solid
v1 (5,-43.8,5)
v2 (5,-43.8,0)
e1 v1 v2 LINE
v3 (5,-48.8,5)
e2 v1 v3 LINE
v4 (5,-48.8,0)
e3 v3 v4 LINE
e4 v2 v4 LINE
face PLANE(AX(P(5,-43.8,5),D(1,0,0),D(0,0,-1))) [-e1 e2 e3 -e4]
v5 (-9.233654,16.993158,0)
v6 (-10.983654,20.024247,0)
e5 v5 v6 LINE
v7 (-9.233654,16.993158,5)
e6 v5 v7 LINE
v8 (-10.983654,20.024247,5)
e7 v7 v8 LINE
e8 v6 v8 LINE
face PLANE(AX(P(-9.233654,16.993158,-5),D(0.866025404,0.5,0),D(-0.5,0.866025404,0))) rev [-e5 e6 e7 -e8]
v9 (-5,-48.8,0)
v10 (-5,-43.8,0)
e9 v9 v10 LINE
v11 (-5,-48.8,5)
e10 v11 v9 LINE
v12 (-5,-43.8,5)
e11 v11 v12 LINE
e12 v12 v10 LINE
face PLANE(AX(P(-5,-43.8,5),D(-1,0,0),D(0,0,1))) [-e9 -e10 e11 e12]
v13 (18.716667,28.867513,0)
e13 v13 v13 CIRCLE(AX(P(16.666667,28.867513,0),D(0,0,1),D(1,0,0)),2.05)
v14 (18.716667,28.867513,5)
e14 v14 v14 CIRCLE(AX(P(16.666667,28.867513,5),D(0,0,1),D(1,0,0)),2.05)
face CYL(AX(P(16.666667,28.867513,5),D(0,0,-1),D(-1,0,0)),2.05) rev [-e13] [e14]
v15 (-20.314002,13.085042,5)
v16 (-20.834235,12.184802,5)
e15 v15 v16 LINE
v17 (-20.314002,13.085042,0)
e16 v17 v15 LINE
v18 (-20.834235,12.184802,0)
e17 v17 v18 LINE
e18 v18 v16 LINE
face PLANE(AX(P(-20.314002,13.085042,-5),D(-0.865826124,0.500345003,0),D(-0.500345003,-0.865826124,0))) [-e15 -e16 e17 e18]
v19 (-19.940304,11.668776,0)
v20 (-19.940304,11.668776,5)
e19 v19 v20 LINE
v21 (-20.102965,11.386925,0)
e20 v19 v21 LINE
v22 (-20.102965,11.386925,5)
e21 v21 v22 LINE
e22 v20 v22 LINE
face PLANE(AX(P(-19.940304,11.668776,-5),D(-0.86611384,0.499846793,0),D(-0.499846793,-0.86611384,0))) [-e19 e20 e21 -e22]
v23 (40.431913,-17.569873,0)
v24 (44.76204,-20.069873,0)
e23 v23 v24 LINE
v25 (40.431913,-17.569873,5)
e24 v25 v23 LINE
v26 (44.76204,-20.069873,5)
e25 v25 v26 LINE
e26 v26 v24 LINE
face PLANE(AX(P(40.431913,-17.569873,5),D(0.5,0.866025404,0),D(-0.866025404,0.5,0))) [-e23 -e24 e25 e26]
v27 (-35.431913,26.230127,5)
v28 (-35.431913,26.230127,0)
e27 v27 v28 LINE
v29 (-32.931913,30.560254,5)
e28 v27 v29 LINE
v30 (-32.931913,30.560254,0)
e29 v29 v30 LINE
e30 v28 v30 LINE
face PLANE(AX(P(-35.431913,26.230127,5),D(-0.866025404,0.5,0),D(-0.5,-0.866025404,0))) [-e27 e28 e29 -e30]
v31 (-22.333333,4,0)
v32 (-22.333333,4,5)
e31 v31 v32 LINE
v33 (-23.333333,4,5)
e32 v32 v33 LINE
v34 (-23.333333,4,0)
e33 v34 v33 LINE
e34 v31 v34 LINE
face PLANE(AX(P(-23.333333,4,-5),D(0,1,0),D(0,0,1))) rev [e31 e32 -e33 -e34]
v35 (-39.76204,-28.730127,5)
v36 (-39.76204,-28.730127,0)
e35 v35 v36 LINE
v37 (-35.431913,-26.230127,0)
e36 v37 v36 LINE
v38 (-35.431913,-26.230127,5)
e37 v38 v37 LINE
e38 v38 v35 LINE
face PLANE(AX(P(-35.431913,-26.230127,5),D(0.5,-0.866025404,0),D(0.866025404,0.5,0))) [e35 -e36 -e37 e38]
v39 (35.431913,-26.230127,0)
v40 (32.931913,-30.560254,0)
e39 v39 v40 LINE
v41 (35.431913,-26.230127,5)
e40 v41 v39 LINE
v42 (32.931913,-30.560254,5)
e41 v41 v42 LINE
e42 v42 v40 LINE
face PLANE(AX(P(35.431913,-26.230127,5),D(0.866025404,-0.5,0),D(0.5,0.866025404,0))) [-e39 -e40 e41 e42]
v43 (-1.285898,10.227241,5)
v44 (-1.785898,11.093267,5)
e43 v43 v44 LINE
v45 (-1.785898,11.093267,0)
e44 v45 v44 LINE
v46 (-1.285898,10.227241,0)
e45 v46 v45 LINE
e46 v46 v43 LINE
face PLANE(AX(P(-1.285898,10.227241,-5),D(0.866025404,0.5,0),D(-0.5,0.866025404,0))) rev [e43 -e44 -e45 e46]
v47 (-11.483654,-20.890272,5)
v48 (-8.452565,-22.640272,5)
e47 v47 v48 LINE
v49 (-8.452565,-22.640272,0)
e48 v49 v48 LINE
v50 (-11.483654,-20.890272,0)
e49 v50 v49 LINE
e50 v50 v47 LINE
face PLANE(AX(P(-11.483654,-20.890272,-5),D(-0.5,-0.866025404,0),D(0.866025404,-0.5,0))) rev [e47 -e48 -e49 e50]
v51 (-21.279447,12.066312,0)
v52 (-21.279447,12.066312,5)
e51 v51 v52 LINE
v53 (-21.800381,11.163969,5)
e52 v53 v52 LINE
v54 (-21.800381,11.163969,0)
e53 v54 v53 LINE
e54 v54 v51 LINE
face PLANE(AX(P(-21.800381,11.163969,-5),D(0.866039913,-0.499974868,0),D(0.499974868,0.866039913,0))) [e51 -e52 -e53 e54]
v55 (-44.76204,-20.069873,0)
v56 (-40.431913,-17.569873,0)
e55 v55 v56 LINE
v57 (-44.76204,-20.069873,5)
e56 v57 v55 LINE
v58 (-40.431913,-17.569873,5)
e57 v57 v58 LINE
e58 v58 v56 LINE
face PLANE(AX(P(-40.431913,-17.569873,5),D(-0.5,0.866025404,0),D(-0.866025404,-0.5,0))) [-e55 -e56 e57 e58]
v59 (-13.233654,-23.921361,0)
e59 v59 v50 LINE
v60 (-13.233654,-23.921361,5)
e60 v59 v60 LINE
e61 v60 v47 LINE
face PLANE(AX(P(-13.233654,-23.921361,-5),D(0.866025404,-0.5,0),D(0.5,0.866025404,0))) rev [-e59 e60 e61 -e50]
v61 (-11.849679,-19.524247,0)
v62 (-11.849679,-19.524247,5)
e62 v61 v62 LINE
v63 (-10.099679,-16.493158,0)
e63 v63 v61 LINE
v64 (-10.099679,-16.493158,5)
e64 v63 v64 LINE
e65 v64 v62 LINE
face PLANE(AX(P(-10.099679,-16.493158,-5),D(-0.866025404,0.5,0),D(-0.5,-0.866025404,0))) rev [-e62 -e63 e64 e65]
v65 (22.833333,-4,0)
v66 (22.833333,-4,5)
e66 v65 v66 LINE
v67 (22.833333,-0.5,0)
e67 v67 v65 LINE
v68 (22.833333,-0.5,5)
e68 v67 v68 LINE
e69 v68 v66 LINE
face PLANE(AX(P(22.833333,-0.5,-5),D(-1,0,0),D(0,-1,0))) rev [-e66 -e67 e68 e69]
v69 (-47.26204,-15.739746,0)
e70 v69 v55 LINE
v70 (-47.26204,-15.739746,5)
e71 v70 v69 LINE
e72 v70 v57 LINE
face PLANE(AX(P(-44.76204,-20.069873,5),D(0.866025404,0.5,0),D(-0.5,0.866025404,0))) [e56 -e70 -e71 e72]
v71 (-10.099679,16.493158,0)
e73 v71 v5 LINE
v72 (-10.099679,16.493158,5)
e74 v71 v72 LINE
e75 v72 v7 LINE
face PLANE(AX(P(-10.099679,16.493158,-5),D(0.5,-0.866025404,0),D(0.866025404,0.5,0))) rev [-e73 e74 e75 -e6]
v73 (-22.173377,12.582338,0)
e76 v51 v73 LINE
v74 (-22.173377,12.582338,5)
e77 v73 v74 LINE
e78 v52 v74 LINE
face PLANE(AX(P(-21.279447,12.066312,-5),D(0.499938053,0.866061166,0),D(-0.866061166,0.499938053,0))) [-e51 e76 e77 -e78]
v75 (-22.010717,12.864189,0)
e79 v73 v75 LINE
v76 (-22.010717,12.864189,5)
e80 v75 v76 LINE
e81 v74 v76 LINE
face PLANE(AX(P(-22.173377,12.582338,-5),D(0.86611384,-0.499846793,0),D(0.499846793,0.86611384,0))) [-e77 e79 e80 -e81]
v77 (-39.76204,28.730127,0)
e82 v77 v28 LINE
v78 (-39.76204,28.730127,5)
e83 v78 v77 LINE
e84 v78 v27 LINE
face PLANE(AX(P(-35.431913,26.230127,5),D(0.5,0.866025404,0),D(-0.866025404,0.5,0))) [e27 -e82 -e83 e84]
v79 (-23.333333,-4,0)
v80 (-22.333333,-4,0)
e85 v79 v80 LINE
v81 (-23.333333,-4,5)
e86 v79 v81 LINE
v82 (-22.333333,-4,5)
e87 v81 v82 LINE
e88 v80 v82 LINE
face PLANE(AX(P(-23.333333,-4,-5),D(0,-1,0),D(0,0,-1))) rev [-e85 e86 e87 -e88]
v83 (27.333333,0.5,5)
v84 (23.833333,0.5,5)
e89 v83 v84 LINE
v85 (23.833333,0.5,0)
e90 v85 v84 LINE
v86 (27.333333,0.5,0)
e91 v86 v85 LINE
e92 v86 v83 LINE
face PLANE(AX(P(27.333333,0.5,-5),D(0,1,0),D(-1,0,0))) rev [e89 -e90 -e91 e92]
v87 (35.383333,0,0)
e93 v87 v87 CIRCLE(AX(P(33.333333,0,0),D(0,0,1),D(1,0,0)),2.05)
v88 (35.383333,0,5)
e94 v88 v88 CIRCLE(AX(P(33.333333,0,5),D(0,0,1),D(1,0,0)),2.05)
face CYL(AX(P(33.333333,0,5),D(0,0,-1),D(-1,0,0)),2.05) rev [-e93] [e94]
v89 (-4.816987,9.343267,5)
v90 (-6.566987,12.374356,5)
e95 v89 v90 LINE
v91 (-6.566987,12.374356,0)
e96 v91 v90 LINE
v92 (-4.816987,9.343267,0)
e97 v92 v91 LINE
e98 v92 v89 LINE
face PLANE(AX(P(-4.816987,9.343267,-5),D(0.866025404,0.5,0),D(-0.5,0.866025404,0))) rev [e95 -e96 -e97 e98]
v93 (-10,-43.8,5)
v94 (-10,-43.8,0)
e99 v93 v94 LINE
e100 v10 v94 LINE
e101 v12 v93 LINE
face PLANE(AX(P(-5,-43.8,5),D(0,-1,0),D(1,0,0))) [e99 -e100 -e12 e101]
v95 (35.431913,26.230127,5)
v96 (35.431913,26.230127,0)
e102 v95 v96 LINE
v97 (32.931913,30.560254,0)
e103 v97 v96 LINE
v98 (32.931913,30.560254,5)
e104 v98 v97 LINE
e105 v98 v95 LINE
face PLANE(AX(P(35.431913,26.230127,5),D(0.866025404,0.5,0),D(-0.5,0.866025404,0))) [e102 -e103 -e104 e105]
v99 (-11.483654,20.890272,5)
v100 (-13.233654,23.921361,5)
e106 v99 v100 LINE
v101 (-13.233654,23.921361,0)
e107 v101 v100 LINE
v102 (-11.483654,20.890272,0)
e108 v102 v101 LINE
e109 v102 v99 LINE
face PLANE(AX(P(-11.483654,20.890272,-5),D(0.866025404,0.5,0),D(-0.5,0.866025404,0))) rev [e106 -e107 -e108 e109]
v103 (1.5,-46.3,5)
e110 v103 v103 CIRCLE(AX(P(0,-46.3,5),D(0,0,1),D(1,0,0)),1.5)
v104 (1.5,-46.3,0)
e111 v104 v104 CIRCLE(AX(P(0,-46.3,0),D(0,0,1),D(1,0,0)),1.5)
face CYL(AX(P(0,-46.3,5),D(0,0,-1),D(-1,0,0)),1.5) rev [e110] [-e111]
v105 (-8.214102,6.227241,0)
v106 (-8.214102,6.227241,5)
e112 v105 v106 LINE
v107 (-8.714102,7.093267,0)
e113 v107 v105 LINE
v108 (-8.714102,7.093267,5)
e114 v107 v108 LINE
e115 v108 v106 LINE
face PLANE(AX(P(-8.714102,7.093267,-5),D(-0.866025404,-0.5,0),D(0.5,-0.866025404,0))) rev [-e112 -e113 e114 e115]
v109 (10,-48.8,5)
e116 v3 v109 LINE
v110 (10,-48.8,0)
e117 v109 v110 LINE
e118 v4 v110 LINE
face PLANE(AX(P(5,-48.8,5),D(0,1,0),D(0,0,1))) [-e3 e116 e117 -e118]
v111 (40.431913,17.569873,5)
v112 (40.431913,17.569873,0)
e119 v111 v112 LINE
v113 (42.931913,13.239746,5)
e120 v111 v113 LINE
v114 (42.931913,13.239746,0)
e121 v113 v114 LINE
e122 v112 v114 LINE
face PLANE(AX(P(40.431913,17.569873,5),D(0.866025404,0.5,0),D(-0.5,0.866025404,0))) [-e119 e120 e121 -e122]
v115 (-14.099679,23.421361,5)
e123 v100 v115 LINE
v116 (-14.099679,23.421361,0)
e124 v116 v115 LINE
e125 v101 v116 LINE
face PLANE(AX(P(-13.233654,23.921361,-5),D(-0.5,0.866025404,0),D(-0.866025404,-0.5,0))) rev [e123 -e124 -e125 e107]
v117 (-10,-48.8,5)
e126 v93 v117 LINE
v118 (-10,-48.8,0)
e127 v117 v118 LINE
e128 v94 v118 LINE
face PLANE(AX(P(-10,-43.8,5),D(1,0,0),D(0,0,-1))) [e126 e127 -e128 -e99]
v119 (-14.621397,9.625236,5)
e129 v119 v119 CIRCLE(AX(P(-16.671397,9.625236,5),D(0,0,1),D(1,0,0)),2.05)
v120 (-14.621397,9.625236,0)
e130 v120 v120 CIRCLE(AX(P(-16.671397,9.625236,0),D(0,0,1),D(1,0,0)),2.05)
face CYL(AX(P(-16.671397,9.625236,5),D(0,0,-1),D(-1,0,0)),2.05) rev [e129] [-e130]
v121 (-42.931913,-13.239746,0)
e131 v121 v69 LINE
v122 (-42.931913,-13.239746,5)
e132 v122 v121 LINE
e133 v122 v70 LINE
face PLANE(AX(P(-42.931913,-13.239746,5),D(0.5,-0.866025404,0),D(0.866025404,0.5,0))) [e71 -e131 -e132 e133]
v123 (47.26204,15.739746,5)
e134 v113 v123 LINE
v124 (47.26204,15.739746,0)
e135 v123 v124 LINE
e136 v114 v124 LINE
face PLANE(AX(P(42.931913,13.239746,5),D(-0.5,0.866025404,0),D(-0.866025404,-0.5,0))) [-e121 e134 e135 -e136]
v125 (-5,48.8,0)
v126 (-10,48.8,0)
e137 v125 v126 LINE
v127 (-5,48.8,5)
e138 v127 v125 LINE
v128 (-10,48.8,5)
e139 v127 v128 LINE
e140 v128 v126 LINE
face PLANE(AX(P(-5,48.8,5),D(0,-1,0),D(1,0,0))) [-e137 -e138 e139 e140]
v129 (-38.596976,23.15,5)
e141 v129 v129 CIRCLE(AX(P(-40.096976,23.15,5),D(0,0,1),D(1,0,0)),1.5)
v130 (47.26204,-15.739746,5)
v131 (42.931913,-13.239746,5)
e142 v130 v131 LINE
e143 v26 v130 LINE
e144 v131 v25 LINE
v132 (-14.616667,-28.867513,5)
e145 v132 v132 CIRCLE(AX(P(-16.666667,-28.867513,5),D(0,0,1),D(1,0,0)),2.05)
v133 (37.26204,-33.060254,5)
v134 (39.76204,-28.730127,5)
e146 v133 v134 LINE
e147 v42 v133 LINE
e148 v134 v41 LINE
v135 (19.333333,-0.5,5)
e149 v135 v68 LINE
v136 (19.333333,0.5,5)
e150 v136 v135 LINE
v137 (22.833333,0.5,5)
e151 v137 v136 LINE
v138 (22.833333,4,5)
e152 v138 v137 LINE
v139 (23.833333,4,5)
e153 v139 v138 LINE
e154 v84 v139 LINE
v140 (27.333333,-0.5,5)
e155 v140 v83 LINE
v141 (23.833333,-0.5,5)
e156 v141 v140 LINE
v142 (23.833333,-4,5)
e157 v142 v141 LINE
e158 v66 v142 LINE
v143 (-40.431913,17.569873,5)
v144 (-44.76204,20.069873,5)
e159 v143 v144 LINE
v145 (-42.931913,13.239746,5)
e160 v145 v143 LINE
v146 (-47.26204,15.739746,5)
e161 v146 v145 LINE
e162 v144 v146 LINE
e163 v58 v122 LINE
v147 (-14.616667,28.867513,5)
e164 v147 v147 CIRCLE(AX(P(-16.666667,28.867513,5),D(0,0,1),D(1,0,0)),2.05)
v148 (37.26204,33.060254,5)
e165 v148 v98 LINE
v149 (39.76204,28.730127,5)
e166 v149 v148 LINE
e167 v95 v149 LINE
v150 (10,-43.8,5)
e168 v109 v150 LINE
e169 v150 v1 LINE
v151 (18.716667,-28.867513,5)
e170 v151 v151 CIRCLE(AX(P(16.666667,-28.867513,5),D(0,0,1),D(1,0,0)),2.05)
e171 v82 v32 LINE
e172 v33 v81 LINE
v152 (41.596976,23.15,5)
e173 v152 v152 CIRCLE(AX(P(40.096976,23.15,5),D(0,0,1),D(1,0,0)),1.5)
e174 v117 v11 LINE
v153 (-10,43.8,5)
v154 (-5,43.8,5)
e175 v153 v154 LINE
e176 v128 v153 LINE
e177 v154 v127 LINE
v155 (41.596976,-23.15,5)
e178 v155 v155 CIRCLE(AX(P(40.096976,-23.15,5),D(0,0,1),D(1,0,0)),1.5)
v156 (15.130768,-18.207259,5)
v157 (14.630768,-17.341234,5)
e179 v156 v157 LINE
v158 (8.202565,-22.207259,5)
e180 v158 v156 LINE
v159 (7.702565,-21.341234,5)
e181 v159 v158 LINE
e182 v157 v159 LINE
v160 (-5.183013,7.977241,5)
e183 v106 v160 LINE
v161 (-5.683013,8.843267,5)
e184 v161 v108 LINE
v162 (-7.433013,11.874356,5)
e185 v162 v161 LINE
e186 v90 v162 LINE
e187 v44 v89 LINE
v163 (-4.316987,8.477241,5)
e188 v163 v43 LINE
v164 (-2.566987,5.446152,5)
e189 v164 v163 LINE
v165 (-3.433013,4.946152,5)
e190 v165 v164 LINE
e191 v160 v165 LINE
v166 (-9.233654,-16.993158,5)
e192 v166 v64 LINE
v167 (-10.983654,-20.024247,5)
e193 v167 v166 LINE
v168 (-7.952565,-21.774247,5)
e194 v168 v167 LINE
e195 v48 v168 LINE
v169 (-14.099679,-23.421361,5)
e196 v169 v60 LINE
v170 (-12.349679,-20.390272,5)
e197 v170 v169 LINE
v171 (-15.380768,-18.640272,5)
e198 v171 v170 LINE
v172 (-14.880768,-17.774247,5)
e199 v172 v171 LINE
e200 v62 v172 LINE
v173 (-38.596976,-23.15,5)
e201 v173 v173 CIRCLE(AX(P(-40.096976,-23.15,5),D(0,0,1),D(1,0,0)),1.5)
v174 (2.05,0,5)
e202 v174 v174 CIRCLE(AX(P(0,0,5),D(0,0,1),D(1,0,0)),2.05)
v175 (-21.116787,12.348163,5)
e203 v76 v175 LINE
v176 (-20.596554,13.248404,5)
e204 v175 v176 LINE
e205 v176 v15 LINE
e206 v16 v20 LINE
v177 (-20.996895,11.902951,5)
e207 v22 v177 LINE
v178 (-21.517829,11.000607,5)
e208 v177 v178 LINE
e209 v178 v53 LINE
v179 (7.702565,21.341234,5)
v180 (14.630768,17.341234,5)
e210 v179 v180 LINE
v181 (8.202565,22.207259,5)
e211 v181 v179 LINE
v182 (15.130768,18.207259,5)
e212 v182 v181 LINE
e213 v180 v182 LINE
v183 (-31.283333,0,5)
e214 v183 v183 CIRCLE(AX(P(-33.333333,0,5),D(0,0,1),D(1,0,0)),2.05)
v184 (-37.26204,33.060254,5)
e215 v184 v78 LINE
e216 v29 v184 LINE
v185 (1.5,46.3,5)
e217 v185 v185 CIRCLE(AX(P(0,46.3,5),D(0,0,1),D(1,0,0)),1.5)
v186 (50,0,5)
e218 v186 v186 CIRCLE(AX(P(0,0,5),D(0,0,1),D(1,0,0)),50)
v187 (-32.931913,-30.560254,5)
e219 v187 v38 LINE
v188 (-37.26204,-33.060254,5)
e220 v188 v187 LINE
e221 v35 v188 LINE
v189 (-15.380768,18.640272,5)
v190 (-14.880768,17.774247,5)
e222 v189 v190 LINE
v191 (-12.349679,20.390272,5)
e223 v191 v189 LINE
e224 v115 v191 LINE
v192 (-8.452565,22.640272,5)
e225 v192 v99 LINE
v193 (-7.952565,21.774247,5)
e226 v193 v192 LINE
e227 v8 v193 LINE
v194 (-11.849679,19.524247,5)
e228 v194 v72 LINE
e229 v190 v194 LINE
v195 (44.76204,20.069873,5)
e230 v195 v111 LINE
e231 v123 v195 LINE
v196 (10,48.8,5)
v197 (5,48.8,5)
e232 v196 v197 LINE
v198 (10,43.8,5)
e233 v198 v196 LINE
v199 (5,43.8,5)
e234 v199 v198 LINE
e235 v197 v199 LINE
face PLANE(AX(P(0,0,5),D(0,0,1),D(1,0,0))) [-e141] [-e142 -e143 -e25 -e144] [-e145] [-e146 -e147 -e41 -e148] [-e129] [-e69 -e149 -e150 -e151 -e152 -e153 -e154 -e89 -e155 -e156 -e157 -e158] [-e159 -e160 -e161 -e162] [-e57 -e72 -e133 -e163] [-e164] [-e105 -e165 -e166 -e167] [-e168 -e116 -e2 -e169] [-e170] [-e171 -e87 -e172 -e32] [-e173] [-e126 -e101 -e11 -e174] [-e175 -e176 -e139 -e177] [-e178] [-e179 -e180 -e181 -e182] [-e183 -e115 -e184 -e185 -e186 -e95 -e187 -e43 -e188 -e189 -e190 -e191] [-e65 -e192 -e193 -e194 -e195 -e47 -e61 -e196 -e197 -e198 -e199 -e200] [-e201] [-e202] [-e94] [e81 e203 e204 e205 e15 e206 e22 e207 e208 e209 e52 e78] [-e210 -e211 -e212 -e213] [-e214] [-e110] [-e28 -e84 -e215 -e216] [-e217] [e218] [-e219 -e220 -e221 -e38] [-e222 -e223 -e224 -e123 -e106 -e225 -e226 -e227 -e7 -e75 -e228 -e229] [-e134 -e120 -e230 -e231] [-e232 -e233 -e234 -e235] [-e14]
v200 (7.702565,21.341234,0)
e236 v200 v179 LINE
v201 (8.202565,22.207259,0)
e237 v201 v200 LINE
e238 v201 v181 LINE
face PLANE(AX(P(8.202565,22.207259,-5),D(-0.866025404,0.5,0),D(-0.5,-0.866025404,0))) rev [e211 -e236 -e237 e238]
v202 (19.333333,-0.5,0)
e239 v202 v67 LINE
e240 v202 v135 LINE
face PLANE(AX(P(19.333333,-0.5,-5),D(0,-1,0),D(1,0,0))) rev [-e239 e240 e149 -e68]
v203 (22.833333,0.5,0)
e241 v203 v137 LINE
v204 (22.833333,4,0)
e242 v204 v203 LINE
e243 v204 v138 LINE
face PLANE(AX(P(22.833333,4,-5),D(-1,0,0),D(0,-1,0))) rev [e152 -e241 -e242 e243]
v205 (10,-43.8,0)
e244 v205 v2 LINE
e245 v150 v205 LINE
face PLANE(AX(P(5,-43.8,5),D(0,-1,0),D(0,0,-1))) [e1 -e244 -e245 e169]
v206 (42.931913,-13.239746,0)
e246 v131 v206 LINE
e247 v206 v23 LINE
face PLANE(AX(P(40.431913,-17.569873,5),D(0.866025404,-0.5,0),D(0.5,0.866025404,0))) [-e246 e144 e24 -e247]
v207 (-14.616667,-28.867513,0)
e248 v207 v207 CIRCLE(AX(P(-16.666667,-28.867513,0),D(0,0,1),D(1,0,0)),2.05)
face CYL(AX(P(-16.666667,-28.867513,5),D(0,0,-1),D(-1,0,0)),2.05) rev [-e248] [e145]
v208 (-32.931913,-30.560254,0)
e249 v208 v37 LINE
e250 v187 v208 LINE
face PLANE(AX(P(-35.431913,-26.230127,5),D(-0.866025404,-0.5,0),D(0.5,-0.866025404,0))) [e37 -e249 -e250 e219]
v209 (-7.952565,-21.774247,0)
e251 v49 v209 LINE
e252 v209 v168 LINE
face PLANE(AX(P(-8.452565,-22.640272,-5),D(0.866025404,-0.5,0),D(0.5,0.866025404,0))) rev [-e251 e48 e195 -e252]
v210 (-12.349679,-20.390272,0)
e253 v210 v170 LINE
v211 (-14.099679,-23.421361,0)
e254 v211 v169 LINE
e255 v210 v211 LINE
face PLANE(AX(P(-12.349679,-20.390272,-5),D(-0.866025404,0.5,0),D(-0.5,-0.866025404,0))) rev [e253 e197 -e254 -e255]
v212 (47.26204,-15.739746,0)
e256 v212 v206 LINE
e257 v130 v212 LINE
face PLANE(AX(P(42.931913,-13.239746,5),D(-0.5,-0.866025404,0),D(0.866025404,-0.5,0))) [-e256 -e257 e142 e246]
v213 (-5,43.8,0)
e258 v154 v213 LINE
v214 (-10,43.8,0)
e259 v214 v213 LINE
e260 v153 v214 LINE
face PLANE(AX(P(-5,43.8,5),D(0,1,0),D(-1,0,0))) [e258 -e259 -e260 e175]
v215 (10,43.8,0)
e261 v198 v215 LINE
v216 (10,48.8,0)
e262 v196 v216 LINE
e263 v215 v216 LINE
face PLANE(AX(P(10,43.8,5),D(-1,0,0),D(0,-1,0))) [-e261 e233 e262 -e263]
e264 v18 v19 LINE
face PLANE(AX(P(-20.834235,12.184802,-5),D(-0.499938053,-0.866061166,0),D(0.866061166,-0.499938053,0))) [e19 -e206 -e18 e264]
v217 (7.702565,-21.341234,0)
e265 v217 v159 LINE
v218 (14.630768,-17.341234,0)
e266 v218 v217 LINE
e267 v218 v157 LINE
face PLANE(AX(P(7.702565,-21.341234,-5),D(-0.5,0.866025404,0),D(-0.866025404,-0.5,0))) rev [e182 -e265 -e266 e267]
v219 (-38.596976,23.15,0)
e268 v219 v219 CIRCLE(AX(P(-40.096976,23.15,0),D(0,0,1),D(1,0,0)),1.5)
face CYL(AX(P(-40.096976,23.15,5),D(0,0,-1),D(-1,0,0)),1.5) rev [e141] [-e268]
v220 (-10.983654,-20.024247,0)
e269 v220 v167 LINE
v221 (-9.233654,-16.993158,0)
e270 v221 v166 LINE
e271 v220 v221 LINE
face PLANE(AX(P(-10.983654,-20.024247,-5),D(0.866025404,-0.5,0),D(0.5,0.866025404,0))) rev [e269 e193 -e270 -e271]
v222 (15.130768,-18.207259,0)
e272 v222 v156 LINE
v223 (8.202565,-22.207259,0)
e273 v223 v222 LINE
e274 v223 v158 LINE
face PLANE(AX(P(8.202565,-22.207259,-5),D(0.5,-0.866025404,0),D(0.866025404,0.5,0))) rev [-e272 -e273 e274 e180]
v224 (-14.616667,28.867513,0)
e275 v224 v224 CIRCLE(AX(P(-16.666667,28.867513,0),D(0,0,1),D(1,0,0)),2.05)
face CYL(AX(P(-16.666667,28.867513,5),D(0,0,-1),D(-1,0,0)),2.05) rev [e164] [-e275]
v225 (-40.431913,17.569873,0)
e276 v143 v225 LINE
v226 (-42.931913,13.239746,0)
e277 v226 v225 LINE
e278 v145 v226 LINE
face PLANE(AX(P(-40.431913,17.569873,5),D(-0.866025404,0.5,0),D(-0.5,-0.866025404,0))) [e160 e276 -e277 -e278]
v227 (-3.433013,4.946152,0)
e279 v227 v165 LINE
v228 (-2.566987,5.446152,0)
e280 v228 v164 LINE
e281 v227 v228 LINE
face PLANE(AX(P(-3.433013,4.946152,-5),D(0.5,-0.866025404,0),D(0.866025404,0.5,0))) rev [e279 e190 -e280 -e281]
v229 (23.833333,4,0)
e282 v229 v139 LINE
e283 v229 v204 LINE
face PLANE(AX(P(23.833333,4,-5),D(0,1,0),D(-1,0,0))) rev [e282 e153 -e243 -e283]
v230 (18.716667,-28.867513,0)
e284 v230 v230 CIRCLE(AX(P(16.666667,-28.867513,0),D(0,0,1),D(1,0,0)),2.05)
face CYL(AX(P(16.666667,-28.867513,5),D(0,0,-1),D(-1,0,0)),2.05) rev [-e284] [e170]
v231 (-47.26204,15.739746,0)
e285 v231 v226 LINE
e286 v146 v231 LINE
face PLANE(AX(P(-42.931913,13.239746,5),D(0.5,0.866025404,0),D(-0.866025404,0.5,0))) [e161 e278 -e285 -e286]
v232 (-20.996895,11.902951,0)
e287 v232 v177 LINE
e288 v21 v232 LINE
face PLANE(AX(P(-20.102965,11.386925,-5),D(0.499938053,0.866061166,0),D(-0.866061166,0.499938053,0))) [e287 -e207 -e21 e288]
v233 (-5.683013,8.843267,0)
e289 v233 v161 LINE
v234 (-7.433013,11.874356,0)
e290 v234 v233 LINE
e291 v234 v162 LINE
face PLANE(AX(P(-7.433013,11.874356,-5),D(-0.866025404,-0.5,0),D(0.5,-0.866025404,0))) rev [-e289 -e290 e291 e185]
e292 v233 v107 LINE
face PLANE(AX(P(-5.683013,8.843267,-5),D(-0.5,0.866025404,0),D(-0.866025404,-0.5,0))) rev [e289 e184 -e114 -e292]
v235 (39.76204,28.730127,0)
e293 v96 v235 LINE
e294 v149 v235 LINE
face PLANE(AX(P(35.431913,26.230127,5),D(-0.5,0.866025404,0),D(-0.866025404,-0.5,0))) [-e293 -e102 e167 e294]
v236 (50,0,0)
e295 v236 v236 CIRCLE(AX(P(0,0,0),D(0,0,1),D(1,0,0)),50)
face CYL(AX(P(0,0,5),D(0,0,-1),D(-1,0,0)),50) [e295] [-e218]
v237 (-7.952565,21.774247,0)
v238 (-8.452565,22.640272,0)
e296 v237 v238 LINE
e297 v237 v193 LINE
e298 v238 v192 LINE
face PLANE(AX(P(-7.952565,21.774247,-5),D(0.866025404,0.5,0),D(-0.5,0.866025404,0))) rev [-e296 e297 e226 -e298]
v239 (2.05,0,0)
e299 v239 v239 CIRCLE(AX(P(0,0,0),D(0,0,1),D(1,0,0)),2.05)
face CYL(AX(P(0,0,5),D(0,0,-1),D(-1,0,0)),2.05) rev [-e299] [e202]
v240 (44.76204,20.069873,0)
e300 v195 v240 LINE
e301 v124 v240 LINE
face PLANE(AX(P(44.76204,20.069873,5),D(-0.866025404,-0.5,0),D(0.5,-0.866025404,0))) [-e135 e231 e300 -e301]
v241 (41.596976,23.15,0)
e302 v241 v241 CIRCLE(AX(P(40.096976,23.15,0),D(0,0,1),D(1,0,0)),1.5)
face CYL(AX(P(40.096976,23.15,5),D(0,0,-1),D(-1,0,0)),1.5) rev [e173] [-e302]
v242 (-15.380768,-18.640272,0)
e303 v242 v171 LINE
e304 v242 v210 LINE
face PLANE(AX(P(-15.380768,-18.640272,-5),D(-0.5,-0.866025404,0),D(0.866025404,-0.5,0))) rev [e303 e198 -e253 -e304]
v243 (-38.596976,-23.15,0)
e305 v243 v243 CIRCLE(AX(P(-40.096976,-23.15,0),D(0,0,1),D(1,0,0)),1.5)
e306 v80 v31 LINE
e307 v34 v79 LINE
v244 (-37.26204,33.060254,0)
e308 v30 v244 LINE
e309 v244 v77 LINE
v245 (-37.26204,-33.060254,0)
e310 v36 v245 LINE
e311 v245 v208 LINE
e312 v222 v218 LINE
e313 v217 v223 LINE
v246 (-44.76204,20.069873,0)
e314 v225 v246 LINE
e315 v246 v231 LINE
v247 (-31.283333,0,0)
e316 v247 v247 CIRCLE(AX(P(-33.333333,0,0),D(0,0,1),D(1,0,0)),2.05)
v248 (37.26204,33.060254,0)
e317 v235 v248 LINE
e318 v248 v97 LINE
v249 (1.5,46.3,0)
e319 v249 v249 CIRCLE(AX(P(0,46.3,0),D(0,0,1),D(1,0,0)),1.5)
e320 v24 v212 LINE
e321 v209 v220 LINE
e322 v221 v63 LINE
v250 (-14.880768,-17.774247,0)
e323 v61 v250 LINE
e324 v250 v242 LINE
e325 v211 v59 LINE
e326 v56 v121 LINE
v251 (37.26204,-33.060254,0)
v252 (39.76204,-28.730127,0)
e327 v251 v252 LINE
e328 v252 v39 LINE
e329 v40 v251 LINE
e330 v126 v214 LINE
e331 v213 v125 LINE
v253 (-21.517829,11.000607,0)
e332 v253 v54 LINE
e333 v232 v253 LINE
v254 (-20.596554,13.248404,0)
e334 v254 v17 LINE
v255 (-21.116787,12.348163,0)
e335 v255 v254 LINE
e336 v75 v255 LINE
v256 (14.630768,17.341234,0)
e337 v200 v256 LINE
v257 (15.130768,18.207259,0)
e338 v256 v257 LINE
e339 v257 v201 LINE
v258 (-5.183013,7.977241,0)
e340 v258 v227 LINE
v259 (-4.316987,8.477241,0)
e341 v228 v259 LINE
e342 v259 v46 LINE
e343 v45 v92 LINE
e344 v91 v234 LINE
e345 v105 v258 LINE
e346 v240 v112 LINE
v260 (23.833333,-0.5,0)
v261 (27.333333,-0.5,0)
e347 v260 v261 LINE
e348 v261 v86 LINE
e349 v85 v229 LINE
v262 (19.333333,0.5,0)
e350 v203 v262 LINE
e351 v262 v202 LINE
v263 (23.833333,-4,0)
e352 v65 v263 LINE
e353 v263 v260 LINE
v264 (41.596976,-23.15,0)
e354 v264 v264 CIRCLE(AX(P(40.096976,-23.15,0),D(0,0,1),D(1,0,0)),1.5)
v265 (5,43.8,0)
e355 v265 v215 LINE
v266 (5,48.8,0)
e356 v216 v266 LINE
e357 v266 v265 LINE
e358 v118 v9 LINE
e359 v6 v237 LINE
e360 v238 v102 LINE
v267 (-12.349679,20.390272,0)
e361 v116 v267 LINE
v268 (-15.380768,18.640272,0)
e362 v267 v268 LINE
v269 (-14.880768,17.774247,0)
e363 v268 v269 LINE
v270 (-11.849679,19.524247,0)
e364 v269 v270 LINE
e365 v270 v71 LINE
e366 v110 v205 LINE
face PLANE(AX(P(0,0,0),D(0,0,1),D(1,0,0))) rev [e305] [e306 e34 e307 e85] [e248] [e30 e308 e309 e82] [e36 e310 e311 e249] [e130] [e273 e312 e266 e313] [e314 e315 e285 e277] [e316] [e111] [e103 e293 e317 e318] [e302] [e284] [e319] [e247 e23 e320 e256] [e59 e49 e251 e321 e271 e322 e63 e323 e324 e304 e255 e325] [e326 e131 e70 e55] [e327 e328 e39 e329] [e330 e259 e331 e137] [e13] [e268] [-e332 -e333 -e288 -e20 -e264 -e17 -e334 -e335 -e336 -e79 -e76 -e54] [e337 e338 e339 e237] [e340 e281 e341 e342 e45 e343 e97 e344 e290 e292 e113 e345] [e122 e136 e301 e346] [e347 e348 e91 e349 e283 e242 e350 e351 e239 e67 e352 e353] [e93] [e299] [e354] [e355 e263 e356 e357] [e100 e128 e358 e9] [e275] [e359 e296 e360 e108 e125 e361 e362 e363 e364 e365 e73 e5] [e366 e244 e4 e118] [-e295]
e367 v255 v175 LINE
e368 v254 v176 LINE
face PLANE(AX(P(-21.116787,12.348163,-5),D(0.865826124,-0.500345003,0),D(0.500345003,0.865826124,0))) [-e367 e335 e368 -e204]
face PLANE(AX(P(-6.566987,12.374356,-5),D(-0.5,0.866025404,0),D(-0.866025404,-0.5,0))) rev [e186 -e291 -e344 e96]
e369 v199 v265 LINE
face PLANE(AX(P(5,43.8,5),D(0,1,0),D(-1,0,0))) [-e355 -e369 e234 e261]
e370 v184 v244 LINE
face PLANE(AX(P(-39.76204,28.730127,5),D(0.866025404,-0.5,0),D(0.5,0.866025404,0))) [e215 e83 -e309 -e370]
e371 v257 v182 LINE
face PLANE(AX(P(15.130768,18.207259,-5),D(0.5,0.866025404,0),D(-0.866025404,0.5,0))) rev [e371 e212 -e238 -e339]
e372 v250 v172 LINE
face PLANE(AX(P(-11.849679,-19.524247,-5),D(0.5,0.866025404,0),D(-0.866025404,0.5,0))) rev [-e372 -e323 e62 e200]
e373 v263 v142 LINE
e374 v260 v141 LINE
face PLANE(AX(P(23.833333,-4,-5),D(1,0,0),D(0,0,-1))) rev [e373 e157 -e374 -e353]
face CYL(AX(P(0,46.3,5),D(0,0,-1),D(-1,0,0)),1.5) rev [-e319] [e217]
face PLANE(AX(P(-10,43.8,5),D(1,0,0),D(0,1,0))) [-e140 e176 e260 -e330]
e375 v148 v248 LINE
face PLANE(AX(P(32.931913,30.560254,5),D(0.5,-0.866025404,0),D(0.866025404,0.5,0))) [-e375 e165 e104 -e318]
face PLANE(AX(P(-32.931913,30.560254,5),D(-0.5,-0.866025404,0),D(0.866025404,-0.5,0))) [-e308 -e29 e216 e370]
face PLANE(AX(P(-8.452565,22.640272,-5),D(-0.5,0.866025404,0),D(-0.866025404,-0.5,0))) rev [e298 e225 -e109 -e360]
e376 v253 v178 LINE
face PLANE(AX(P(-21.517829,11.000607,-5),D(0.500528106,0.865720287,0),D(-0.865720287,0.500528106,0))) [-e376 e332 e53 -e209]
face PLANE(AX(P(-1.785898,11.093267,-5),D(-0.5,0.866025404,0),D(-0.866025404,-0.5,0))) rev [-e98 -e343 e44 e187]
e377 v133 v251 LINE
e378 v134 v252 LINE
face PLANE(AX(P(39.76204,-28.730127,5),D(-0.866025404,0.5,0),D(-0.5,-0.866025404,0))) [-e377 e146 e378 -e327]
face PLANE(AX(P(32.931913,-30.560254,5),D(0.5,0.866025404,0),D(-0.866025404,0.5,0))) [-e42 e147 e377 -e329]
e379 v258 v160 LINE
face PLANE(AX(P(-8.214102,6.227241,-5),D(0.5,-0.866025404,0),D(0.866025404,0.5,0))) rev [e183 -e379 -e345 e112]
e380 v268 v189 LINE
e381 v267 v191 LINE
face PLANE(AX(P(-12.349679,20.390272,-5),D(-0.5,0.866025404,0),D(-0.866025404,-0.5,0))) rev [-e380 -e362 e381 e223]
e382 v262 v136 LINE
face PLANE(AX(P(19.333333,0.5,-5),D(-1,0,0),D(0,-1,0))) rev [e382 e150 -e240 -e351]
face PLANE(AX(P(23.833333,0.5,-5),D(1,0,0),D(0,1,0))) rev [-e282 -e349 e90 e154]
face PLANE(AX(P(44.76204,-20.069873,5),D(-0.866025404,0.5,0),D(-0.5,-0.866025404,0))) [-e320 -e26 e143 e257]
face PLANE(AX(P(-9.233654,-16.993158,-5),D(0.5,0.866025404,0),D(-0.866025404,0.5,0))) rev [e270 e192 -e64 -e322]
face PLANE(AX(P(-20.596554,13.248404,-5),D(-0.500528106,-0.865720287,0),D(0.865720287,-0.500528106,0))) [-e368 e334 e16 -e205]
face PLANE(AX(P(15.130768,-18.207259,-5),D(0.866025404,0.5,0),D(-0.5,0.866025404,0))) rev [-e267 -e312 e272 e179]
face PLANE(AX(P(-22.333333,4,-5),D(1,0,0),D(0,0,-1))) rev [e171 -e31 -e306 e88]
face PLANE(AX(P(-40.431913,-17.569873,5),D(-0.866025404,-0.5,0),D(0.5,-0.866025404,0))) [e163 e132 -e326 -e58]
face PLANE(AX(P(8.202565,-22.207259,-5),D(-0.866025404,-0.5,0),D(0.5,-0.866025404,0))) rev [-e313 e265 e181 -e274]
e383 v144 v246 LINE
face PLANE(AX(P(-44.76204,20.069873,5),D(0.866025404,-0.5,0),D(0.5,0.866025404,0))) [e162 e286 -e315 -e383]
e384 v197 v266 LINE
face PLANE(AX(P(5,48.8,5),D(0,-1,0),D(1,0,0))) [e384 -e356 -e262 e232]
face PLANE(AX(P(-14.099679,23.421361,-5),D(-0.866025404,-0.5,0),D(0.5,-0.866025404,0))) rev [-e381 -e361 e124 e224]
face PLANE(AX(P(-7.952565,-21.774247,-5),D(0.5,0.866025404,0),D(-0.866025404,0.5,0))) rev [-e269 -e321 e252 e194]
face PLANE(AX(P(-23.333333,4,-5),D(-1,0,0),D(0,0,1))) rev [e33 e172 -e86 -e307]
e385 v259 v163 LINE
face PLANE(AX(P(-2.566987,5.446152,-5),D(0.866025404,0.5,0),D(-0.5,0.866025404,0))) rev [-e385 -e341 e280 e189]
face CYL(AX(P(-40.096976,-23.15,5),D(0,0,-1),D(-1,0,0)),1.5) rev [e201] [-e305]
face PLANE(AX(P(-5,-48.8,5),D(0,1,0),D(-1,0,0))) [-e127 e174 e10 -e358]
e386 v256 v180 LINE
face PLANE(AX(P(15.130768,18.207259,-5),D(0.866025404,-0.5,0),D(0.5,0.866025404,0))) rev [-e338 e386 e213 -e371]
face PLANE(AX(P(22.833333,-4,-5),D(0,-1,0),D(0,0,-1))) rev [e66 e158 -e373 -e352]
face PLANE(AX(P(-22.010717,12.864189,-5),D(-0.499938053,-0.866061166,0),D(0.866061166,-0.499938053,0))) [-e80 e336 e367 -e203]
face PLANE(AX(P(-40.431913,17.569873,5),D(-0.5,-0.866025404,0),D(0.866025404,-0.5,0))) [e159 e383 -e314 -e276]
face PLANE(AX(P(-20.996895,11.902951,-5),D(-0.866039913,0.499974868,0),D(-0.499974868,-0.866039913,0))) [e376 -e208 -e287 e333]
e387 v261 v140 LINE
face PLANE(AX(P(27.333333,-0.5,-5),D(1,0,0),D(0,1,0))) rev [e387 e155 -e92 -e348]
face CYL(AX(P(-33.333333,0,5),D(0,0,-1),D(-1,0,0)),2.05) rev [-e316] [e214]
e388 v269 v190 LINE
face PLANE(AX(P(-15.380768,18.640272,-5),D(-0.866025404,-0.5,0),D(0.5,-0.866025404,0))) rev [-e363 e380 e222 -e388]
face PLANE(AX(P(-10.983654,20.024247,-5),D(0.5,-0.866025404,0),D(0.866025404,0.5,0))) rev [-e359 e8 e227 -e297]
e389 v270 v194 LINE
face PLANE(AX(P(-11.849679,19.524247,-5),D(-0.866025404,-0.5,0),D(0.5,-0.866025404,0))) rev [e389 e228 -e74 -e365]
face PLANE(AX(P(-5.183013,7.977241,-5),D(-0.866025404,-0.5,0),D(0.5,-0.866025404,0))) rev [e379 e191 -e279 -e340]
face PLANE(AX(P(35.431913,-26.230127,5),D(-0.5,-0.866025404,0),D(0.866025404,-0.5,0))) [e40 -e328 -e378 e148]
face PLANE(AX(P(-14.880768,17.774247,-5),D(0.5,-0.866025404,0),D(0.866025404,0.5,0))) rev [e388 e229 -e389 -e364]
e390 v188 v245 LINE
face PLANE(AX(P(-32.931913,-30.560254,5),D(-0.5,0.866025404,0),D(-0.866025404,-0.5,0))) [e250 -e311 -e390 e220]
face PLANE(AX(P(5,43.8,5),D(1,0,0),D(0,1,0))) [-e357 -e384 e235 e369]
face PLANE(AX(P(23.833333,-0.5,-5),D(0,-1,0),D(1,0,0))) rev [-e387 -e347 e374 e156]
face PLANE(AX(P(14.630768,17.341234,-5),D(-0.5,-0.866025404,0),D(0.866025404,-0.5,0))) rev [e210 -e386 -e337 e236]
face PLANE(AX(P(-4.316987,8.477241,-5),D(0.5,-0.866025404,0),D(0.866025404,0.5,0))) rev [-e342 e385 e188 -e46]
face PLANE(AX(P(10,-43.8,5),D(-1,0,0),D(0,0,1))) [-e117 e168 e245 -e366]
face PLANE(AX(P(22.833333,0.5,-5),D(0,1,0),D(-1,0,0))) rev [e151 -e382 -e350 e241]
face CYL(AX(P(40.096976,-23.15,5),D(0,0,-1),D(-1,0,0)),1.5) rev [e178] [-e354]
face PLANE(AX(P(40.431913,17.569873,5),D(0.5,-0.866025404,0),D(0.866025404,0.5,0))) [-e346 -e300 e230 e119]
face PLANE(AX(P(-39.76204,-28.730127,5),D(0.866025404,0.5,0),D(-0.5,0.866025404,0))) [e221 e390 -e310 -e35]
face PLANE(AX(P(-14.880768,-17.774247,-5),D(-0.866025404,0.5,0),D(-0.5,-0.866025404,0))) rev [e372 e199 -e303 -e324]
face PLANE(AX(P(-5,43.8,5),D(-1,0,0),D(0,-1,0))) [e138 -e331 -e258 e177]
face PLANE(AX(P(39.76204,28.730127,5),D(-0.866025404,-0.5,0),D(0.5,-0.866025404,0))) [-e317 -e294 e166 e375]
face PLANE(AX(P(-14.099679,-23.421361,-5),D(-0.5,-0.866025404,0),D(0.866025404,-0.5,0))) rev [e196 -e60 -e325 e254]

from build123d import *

# Parameters (mm, degrees)
BOSS_EXTRU_1_OUTLINE_R   = 50
BOSS_EXTRU_1_OUTLINE_W   = 5
BOSS_EXTRU_1_OUTLINE_H   = 5
BOSS_EXTRU_1_OUTLINE_R_2 = 2.05
BOSS_EXTRU_1_OUTLINE_R_3 = 1.5
BOSS_EXTRU_1_DEPTH       = 5
SKETCH3_W                = 1
SKETCH3_H                = 8
CUT_EXTRUDE2_DEPTH       = 10


# Read off the part's stored shape, not the designer's step: Boss.-Extru.1
with BuildPart() as part:
    # Boss.-Extru.1 outline → Boss.-Extru.1 (new body)
    with BuildSketch(Plane.XY):
        Circle(BOSS_EXTRU_1_OUTLINE_R)
        Polygon((-37.262039705, -33.060254038), (-39.762039705, -28.730127019), (-35.431912686, -26.230127019), (-32.931912686, -30.560254038), align=None, mode=Mode.SUBTRACT)
        with Locations((-7.5, -46.3)):
            Rectangle(BOSS_EXTRU_1_OUTLINE_W, BOSS_EXTRU_1_OUTLINE_H, mode=Mode.SUBTRACT)
        with Locations((-16.666666667, -28.867513459)):
            Circle(BOSS_EXTRU_1_OUTLINE_R_2, mode=Mode.SUBTRACT)
        with Locations((-40.096976195, -23.15)):
            Circle(BOSS_EXTRU_1_OUTLINE_R_3, mode=Mode.SUBTRACT)
        Polygon((-42.931912686, -13.239745962), (-40.431912686, -17.569872981), (-44.762039705, -20.069872981), (-47.262039705, -15.739745962), align=None, mode=Mode.SUBTRACT)
        with Locations((0, -46.3)):
            Circle(BOSS_EXTRU_1_OUTLINE_R_3, mode=Mode.SUBTRACT)
        with Locations((7.5, -46.3)):
            Rectangle(BOSS_EXTRU_1_OUTLINE_W, BOSS_EXTRU_1_OUTLINE_H, mode=Mode.SUBTRACT)
        with Locations((16.666666667, -28.867513459)):
            Circle(BOSS_EXTRU_1_OUTLINE_R_2, mode=Mode.SUBTRACT)
        Polygon((32.931912686, -30.560254038), (35.431912686, -26.230127019), (39.762039705, -28.730127019), (37.262039705, -33.060254038), align=None, mode=Mode.SUBTRACT)
        with Locations((40.096976195, -23.15)):
            Circle(BOSS_EXTRU_1_OUTLINE_R_3, mode=Mode.SUBTRACT)
        Polygon((47.262039705, -15.739745962), (44.762039705, -20.069872981), (40.431912686, -17.569872981), (42.931912686, -13.239745962), align=None, mode=Mode.SUBTRACT)
        with Locations((-33.333333333, 0)):
            Circle(BOSS_EXTRU_1_OUTLINE_R_2, mode=Mode.SUBTRACT)
        Polygon((-47.262039705, 15.739745962), (-44.762039705, 20.069872981), (-40.431912686, 17.569872981), (-42.931912686, 13.239745962), align=None, mode=Mode.SUBTRACT)
        with Locations((-40.096976195, 23.15)):
            Circle(BOSS_EXTRU_1_OUTLINE_R_3, mode=Mode.SUBTRACT)
        with Locations((-16.671397032, 9.625235564)):
            Circle(BOSS_EXTRU_1_OUTLINE_R_2, mode=Mode.SUBTRACT)
        Polygon((-32.931912686, 30.560254038), (-35.431912686, 26.230127019), (-39.762039705, 28.730127019), (-37.262039705, 33.060254038), align=None, mode=Mode.SUBTRACT)
        with Locations((-16.666666667, 28.867513459)):
            Circle(BOSS_EXTRU_1_OUTLINE_R_2, mode=Mode.SUBTRACT)
        with Locations((-7.5, 46.3)):
            Rectangle(BOSS_EXTRU_1_OUTLINE_W, BOSS_EXTRU_1_OUTLINE_H, mode=Mode.SUBTRACT)
        Circle(BOSS_EXTRU_1_OUTLINE_R_2, mode=Mode.SUBTRACT)
        with Locations((33.333333333, 0)):
            Circle(BOSS_EXTRU_1_OUTLINE_R_2, mode=Mode.SUBTRACT)
        Polygon((42.931912686, 13.239745962), (40.431912686, 17.569872981), (44.762039705, 20.069872981), (47.262039705, 15.739745962), align=None, mode=Mode.SUBTRACT)
        with Locations((40.096976195, 23.15)):
            Circle(BOSS_EXTRU_1_OUTLINE_R_3, mode=Mode.SUBTRACT)
        with Locations((16.666666667, 28.867513459)):
            Circle(BOSS_EXTRU_1_OUTLINE_R_2, mode=Mode.SUBTRACT)
        with Locations((0, 46.3)):
            Circle(BOSS_EXTRU_1_OUTLINE_R_3, mode=Mode.SUBTRACT)
        with Locations((7.5, 46.3)):
            Rectangle(BOSS_EXTRU_1_OUTLINE_W, BOSS_EXTRU_1_OUTLINE_H, mode=Mode.SUBTRACT)
        Polygon((37.262039705, 33.060254038), (39.762039705, 28.730127019), (35.431912686, 26.230127019), (32.931912686, 30.560254038), align=None, mode=Mode.SUBTRACT)
    extrude(amount=BOSS_EXTRU_1_DEPTH)

    # Sketch3 → Cut-Extrude2 (cut)
    with BuildSketch(Plane.XY.offset(5)):
        with Locations((-22.833333333, 0)):
            Rectangle(SKETCH3_W, SKETCH3_H)
        Polygon((-13.233653965, 23.921361037), (-14.099679369, 23.421361037), (-12.349679369, 20.390272124), (-15.380768282, 18.640272124), (-14.880768282, 17.77424672), (-11.849679369, 19.52424672), (-10.099679369, 16.493157806), (-9.233653965, 16.993157806), (-10.983653965, 20.02424672), (-7.952565052, 21.77424672), (-8.452565052, 22.640272124), (-11.483653965, 20.890272124), align=None)
        Polygon((15.130768282, 18.207259422), (14.630768282, 17.341234018), (7.702565052, 21.341234018), (8.202565052, 22.207259422), align=None)
        Polygon((8.202565052, -22.207259422), (7.702565052, -21.341234018), (14.630768282, -17.341234018), (15.130768282, -18.207259422), align=None)
        Polygon((27.333333333, -0.5), (27.333333333, 0.5), (23.833333333, 0.5), (23.833333333, 4), (22.833333333, 4), (22.833333333, 0.5), (19.333333333, 0.5), (19.333333333, -0.5), (22.833333333, -0.5), (22.833333333, -4), (23.833333333, -4), (23.833333333, -0.5), align=None)
        Polygon((-14.099679369, -23.421361037), (-13.233653965, -23.921361037), (-11.483653965, -20.890272124), (-8.452565052, -22.640272124), (-7.952565052, -21.77424672), (-10.983653965, -20.02424672), (-9.233653965, -16.993157806), (-10.099679369, -16.493157806), (-11.849679369, -19.52424672), (-14.880768282, -17.77424672), (-15.380768282, -18.640272124), (-12.349679369, -20.390272124), align=None)
        Polygon((-7.433012703, 11.874355655), (-5.683012702, 8.843266741), (-8.714101616, 7.093266741), (-8.214101616, 6.227241337), (-5.183012702, 7.977241336), (-3.433012703, 4.946152425), (-2.566987299, 5.446152425), (-4.316987299, 8.477241337), (-1.285898385, 10.227241337), (-1.785898385, 11.093266741), (-4.816987299, 9.343266741), (-6.566987299, 12.374355655), align=None)
        Polygon((-20.834234776, 12.184801987), (-19.940304487, 11.668776346), (-20.102964744, 11.386925384), (-20.996895032, 11.902951025), (-21.517828526, 11.000607275), (-21.800380609, 11.163968654), (-21.279447115, 12.066312404), (-22.173377404, 12.582338045), (-22.010717147, 12.864189006), (-21.116786859, 12.348163365), (-20.596554487, 13.24840375), (-20.314002404, 13.085042371), align=None)
    extrude(amount=-CUT_EXTRUDE2_DEPTH, mode=Mode.SUBTRACT)


solid = part.part
